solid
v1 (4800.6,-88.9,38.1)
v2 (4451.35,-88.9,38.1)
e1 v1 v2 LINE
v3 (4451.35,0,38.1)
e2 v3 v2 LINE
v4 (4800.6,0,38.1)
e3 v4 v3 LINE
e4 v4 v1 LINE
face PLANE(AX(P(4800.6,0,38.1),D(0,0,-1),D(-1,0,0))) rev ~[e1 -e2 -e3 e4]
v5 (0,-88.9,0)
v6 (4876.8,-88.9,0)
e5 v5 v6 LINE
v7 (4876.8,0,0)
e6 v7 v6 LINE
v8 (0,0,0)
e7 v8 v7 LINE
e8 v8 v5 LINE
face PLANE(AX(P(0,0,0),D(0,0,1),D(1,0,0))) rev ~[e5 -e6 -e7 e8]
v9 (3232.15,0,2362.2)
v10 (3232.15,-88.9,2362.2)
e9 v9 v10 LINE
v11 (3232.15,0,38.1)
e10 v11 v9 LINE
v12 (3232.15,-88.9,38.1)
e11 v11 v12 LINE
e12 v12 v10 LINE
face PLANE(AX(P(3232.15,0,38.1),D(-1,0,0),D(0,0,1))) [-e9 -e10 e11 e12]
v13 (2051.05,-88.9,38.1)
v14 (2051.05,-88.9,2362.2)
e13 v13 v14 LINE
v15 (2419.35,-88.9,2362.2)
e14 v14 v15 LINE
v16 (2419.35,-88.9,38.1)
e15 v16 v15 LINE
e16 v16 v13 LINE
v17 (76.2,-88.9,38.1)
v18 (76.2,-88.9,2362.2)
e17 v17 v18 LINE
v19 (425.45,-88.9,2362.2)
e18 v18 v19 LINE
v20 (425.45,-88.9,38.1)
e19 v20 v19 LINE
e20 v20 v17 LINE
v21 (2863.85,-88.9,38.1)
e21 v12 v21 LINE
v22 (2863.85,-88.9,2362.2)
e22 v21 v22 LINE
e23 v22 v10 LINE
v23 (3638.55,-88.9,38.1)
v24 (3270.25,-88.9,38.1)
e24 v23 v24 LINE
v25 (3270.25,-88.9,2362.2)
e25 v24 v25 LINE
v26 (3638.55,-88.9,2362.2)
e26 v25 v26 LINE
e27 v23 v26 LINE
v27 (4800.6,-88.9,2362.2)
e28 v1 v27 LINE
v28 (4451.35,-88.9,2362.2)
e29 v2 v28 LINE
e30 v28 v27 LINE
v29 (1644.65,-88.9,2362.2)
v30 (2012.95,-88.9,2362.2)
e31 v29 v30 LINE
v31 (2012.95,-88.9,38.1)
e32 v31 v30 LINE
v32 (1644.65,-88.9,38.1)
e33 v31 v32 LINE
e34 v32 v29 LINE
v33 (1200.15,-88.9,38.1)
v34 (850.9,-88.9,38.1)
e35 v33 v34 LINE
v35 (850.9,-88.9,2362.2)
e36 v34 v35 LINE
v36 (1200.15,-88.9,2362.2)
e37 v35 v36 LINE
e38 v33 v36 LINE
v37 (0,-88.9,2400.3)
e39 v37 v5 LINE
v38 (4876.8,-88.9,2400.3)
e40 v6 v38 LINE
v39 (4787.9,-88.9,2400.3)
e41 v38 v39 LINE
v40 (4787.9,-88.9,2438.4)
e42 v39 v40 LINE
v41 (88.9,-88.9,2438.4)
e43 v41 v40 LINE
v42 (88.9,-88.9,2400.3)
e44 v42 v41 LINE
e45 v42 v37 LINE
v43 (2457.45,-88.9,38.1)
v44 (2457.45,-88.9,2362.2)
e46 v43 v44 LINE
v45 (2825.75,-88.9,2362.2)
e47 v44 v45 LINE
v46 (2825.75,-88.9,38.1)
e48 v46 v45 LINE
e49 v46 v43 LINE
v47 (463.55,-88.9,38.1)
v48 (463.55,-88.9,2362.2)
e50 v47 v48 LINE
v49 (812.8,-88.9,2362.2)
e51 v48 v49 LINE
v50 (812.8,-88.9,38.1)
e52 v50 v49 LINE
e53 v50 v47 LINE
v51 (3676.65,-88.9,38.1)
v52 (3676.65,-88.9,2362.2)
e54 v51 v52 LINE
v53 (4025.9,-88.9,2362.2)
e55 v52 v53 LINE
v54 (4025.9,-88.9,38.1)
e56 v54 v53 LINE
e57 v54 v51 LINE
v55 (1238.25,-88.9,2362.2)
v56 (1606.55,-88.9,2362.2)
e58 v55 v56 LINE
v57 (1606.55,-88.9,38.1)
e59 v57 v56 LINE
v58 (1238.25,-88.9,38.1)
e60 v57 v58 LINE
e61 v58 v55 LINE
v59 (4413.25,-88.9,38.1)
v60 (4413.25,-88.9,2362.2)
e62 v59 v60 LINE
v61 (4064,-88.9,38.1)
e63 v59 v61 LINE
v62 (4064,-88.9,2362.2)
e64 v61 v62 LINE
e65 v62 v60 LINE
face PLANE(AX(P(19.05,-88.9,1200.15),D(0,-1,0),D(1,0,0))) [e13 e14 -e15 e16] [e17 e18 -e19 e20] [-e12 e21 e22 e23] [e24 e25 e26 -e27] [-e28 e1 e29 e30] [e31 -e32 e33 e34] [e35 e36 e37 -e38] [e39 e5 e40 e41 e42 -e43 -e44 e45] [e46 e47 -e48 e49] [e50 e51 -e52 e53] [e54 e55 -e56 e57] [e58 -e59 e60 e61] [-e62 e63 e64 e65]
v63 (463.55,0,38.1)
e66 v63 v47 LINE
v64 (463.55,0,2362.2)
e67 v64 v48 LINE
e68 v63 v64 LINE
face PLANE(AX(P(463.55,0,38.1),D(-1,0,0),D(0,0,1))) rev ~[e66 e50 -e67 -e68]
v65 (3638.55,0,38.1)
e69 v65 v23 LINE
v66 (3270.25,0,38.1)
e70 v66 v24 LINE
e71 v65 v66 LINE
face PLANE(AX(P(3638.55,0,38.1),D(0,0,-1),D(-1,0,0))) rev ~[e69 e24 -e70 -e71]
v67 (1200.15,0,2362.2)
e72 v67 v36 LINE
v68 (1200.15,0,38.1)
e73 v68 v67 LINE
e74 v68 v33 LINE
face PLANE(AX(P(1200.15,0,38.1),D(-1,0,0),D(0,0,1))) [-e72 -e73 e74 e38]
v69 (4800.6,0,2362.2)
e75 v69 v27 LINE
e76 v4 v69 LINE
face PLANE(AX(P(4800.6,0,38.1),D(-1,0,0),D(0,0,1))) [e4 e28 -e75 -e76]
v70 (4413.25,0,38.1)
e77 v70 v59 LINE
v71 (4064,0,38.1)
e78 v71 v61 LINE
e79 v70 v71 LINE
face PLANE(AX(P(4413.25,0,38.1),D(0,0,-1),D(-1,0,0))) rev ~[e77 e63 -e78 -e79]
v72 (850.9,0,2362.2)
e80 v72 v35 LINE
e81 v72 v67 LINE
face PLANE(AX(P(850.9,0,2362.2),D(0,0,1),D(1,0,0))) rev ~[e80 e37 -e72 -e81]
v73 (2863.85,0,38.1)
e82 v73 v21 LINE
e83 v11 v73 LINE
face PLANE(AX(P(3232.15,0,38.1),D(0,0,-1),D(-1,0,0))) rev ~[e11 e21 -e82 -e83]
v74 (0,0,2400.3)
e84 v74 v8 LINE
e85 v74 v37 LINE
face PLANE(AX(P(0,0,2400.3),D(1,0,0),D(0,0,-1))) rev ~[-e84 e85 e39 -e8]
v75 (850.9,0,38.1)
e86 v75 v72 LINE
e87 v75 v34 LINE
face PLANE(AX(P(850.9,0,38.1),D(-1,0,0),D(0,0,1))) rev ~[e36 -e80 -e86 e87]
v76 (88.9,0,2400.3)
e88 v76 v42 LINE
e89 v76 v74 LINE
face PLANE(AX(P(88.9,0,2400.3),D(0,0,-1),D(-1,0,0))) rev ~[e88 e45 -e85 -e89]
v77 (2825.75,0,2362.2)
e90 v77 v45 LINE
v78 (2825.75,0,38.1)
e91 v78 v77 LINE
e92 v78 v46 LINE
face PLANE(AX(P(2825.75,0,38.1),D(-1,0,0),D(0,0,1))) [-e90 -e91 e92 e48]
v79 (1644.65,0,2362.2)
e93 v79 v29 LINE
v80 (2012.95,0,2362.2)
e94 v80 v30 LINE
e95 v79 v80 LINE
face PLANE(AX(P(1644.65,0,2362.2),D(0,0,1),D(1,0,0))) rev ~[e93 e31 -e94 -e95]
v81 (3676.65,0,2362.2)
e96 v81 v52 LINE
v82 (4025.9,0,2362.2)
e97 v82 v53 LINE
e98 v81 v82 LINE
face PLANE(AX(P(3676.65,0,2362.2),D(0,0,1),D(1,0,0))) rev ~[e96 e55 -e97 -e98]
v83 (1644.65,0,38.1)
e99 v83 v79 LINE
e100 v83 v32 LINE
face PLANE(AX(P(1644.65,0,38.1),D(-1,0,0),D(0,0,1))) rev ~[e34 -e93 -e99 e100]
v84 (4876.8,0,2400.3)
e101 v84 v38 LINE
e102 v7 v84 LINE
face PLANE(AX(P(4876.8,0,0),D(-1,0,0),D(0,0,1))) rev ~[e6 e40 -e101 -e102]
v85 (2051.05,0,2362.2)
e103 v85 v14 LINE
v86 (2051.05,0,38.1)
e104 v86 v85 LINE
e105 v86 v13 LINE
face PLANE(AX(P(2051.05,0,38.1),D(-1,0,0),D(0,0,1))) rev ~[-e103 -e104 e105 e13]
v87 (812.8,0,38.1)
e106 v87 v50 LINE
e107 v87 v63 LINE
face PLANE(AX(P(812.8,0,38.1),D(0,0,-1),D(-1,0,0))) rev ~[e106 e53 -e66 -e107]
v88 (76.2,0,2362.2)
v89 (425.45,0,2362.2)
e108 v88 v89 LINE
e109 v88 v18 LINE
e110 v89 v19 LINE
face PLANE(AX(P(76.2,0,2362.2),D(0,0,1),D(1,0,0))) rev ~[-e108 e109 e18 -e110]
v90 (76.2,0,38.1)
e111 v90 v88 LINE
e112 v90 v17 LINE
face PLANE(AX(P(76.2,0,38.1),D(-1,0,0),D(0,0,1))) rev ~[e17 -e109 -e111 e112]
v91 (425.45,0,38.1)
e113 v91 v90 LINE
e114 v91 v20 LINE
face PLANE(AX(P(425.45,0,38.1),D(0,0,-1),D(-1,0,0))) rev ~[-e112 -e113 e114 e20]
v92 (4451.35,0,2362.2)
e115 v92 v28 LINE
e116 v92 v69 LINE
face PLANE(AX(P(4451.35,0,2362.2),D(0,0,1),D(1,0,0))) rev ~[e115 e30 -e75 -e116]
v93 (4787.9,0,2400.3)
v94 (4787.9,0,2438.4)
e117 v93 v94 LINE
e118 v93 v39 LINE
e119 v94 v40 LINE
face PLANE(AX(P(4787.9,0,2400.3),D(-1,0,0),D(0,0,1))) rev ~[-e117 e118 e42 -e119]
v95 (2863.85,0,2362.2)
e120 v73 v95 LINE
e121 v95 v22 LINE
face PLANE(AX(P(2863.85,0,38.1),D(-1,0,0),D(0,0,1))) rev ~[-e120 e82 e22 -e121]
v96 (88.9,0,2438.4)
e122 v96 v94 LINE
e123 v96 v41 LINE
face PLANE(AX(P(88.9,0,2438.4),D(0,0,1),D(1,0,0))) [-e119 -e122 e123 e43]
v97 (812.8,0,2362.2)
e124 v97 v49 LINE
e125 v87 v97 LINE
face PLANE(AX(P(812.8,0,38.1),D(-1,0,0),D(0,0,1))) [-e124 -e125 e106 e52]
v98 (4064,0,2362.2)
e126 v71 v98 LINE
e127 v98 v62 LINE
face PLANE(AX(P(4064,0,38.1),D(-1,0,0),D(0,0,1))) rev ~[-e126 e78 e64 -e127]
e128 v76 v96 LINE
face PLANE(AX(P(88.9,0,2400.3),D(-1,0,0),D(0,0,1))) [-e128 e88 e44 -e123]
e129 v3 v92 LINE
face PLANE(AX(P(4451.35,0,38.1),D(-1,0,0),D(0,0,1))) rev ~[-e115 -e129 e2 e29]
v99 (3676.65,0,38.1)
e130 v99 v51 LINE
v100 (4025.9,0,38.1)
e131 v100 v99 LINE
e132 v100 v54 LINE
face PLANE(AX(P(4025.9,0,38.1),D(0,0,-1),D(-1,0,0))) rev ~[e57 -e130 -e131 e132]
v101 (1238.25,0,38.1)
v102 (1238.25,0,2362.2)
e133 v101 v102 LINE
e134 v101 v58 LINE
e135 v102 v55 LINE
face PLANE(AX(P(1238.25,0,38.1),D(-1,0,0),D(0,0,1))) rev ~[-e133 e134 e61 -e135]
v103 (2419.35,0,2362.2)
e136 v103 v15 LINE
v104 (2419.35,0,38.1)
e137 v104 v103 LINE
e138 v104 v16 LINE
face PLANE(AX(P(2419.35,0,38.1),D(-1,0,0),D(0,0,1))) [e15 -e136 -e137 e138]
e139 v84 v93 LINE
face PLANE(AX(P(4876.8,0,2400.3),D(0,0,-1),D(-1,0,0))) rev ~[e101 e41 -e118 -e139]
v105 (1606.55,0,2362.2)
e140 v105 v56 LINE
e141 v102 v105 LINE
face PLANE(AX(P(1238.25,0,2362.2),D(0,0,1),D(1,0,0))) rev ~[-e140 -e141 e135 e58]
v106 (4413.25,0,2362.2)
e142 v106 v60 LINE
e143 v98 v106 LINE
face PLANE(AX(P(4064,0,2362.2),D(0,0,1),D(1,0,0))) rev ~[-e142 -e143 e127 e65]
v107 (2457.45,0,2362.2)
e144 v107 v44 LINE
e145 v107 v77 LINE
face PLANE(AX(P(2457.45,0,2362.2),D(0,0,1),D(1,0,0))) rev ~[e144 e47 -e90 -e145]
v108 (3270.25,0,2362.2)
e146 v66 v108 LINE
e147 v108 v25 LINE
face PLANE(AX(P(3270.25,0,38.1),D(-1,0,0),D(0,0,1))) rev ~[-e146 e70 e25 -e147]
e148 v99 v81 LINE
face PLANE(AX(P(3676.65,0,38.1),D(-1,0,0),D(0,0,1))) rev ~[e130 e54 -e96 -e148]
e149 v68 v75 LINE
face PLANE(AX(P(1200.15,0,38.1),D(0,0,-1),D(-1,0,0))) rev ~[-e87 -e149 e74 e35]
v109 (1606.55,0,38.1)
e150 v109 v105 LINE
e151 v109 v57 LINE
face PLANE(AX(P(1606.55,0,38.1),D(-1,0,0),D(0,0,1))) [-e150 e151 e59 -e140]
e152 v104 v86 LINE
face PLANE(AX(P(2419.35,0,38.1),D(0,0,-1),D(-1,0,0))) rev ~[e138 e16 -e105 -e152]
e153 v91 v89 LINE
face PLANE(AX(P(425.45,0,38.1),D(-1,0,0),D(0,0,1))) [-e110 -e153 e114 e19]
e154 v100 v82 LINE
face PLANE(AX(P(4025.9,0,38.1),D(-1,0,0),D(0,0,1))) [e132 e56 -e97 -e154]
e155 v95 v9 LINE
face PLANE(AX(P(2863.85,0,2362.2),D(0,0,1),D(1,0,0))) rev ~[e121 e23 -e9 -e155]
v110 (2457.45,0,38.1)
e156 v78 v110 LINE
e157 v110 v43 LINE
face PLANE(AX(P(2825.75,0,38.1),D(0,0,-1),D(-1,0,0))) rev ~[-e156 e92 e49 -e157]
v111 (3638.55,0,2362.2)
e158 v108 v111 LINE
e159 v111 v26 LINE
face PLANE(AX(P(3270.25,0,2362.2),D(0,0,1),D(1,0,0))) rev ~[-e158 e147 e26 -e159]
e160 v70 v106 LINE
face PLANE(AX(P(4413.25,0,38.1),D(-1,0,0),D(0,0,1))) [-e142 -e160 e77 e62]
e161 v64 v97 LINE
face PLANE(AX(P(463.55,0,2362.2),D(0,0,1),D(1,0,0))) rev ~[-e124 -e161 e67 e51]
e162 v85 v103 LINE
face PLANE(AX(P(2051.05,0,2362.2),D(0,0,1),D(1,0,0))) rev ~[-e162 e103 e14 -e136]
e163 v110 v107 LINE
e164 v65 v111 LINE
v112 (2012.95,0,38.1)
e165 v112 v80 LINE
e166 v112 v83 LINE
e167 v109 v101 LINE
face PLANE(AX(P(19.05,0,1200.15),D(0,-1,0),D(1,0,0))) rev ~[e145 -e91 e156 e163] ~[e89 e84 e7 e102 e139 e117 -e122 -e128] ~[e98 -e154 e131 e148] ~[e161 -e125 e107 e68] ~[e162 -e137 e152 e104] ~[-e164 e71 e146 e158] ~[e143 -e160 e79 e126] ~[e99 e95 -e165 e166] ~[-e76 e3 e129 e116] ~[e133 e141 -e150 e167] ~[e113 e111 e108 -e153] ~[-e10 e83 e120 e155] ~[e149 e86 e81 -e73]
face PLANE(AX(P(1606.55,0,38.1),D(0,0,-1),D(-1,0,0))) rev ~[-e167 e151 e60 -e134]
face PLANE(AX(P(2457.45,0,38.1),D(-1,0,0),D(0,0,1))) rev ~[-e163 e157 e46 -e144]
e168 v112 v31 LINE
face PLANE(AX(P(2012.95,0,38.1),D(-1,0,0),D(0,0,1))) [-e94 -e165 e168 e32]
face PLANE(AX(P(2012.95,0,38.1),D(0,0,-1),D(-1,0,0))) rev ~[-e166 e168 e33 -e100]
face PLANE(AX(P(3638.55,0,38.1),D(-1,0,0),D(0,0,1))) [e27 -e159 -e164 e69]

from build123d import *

# Parameters (mm, degrees)
F0_W     = 38.1
F0_H     = 2324.1
F0_W_2   = 4699
F0_H_2   = 38.1
F1_DEPTH = 88.9


# Not quite as in the source:
# - a feature names something its author has since deleted; it is built from what else it names


with BuildPart() as f1:
    # F0 (on Front) → F1 (new body)
    with BuildSketch(Plane.XZ):
        with Locations((19.05, 1200.15)):
            Rectangle(F0_W, F0_H)
        with Locations((57.15, 1200.15)):
            Rectangle(F0_W, F0_H)
        with Locations((444.5, 1200.15)):
            Rectangle(F0_W, F0_H)
        with Locations((831.85, 1200.15)):
            Rectangle(F0_W, F0_H)
        with Locations((1219.2, 1200.15)):
            Rectangle(F0_W, F0_H)
        with Locations((2032, 1200.15)):
            Rectangle(F0_W, F0_H)
        with Locations((4819.65, 1200.15)):
            Rectangle(F0_W, F0_H)
        with Locations((4857.75, 1200.15)):
            Rectangle(F0_W, F0_H)
        Polygon((0, 2400.3), (0, 2362.2), (38.1, 2362.2), (76.2, 2362.2), (425.45, 2362.2), (463.55, 2362.2), (812.8, 2362.2), (850.9, 2362.2), (1200.15, 2362.2), (1238.25, 2362.2), (1606.55, 2362.2), (1644.65, 2362.2), (2012.95, 2362.2), (2051.05, 2362.2), (2419.35, 2362.2), (2457.45, 2362.2), (2825.75, 2362.2), (2863.85, 2362.2), (3232.15, 2362.2), (3270.25, 2362.2), (3638.55, 2362.2), (3676.65, 2362.2), (4025.9, 2362.2), (4064, 2362.2), (4413.25, 2362.2), (4451.35, 2362.2), (4800.6, 2362.2), (4838.7, 2362.2), (4876.8, 2362.2), (4876.8, 2400.3), (4787.9, 2400.3), (88.9, 2400.3), align=None)
        with Locations((2438.4, 2419.35)):
            Rectangle(F0_W_2, F0_H_2)
        Polygon((0, 38.1), (0, 0), (4876.8, 0), (4876.8, 38.1), (4838.7, 38.1), (4800.6, 38.1), (4451.35, 38.1), (4413.25, 38.1), (4064, 38.1), (4025.9, 38.1), (3676.65, 38.1), (3638.55, 38.1), (3270.25, 38.1), (3232.15, 38.1), (2863.85, 38.1), (2825.75, 38.1), (2457.45, 38.1), (2419.35, 38.1), (2051.05, 38.1), (2012.95, 38.1), (1644.65, 38.1), (1606.55, 38.1), (1238.25, 38.1), (1200.15, 38.1), (850.9, 38.1), (812.8, 38.1), (463.55, 38.1), (425.45, 38.1), (76.2, 38.1), (38.1, 38.1), align=None)
        with Locations((1625.6, 1200.15)):
            Rectangle(F0_W, F0_H)
        with Locations((2438.4, 1200.15)):
            Rectangle(F0_W, F0_H)
        with Locations((2844.8, 1200.15)):
            Rectangle(F0_W, F0_H)
        with Locations((3251.2, 1200.15)):
            Rectangle(F0_W, F0_H)
        with Locations((3657.6, 1200.15)):
            Rectangle(F0_W, F0_H)
        with Locations((4044.95, 1200.15)):
            Rectangle(F0_W, F0_H)
        with Locations((4432.3, 1200.15)):
            Rectangle(F0_W, F0_H)
    extrude(amount=F1_DEPTH)


solid = f1.part
